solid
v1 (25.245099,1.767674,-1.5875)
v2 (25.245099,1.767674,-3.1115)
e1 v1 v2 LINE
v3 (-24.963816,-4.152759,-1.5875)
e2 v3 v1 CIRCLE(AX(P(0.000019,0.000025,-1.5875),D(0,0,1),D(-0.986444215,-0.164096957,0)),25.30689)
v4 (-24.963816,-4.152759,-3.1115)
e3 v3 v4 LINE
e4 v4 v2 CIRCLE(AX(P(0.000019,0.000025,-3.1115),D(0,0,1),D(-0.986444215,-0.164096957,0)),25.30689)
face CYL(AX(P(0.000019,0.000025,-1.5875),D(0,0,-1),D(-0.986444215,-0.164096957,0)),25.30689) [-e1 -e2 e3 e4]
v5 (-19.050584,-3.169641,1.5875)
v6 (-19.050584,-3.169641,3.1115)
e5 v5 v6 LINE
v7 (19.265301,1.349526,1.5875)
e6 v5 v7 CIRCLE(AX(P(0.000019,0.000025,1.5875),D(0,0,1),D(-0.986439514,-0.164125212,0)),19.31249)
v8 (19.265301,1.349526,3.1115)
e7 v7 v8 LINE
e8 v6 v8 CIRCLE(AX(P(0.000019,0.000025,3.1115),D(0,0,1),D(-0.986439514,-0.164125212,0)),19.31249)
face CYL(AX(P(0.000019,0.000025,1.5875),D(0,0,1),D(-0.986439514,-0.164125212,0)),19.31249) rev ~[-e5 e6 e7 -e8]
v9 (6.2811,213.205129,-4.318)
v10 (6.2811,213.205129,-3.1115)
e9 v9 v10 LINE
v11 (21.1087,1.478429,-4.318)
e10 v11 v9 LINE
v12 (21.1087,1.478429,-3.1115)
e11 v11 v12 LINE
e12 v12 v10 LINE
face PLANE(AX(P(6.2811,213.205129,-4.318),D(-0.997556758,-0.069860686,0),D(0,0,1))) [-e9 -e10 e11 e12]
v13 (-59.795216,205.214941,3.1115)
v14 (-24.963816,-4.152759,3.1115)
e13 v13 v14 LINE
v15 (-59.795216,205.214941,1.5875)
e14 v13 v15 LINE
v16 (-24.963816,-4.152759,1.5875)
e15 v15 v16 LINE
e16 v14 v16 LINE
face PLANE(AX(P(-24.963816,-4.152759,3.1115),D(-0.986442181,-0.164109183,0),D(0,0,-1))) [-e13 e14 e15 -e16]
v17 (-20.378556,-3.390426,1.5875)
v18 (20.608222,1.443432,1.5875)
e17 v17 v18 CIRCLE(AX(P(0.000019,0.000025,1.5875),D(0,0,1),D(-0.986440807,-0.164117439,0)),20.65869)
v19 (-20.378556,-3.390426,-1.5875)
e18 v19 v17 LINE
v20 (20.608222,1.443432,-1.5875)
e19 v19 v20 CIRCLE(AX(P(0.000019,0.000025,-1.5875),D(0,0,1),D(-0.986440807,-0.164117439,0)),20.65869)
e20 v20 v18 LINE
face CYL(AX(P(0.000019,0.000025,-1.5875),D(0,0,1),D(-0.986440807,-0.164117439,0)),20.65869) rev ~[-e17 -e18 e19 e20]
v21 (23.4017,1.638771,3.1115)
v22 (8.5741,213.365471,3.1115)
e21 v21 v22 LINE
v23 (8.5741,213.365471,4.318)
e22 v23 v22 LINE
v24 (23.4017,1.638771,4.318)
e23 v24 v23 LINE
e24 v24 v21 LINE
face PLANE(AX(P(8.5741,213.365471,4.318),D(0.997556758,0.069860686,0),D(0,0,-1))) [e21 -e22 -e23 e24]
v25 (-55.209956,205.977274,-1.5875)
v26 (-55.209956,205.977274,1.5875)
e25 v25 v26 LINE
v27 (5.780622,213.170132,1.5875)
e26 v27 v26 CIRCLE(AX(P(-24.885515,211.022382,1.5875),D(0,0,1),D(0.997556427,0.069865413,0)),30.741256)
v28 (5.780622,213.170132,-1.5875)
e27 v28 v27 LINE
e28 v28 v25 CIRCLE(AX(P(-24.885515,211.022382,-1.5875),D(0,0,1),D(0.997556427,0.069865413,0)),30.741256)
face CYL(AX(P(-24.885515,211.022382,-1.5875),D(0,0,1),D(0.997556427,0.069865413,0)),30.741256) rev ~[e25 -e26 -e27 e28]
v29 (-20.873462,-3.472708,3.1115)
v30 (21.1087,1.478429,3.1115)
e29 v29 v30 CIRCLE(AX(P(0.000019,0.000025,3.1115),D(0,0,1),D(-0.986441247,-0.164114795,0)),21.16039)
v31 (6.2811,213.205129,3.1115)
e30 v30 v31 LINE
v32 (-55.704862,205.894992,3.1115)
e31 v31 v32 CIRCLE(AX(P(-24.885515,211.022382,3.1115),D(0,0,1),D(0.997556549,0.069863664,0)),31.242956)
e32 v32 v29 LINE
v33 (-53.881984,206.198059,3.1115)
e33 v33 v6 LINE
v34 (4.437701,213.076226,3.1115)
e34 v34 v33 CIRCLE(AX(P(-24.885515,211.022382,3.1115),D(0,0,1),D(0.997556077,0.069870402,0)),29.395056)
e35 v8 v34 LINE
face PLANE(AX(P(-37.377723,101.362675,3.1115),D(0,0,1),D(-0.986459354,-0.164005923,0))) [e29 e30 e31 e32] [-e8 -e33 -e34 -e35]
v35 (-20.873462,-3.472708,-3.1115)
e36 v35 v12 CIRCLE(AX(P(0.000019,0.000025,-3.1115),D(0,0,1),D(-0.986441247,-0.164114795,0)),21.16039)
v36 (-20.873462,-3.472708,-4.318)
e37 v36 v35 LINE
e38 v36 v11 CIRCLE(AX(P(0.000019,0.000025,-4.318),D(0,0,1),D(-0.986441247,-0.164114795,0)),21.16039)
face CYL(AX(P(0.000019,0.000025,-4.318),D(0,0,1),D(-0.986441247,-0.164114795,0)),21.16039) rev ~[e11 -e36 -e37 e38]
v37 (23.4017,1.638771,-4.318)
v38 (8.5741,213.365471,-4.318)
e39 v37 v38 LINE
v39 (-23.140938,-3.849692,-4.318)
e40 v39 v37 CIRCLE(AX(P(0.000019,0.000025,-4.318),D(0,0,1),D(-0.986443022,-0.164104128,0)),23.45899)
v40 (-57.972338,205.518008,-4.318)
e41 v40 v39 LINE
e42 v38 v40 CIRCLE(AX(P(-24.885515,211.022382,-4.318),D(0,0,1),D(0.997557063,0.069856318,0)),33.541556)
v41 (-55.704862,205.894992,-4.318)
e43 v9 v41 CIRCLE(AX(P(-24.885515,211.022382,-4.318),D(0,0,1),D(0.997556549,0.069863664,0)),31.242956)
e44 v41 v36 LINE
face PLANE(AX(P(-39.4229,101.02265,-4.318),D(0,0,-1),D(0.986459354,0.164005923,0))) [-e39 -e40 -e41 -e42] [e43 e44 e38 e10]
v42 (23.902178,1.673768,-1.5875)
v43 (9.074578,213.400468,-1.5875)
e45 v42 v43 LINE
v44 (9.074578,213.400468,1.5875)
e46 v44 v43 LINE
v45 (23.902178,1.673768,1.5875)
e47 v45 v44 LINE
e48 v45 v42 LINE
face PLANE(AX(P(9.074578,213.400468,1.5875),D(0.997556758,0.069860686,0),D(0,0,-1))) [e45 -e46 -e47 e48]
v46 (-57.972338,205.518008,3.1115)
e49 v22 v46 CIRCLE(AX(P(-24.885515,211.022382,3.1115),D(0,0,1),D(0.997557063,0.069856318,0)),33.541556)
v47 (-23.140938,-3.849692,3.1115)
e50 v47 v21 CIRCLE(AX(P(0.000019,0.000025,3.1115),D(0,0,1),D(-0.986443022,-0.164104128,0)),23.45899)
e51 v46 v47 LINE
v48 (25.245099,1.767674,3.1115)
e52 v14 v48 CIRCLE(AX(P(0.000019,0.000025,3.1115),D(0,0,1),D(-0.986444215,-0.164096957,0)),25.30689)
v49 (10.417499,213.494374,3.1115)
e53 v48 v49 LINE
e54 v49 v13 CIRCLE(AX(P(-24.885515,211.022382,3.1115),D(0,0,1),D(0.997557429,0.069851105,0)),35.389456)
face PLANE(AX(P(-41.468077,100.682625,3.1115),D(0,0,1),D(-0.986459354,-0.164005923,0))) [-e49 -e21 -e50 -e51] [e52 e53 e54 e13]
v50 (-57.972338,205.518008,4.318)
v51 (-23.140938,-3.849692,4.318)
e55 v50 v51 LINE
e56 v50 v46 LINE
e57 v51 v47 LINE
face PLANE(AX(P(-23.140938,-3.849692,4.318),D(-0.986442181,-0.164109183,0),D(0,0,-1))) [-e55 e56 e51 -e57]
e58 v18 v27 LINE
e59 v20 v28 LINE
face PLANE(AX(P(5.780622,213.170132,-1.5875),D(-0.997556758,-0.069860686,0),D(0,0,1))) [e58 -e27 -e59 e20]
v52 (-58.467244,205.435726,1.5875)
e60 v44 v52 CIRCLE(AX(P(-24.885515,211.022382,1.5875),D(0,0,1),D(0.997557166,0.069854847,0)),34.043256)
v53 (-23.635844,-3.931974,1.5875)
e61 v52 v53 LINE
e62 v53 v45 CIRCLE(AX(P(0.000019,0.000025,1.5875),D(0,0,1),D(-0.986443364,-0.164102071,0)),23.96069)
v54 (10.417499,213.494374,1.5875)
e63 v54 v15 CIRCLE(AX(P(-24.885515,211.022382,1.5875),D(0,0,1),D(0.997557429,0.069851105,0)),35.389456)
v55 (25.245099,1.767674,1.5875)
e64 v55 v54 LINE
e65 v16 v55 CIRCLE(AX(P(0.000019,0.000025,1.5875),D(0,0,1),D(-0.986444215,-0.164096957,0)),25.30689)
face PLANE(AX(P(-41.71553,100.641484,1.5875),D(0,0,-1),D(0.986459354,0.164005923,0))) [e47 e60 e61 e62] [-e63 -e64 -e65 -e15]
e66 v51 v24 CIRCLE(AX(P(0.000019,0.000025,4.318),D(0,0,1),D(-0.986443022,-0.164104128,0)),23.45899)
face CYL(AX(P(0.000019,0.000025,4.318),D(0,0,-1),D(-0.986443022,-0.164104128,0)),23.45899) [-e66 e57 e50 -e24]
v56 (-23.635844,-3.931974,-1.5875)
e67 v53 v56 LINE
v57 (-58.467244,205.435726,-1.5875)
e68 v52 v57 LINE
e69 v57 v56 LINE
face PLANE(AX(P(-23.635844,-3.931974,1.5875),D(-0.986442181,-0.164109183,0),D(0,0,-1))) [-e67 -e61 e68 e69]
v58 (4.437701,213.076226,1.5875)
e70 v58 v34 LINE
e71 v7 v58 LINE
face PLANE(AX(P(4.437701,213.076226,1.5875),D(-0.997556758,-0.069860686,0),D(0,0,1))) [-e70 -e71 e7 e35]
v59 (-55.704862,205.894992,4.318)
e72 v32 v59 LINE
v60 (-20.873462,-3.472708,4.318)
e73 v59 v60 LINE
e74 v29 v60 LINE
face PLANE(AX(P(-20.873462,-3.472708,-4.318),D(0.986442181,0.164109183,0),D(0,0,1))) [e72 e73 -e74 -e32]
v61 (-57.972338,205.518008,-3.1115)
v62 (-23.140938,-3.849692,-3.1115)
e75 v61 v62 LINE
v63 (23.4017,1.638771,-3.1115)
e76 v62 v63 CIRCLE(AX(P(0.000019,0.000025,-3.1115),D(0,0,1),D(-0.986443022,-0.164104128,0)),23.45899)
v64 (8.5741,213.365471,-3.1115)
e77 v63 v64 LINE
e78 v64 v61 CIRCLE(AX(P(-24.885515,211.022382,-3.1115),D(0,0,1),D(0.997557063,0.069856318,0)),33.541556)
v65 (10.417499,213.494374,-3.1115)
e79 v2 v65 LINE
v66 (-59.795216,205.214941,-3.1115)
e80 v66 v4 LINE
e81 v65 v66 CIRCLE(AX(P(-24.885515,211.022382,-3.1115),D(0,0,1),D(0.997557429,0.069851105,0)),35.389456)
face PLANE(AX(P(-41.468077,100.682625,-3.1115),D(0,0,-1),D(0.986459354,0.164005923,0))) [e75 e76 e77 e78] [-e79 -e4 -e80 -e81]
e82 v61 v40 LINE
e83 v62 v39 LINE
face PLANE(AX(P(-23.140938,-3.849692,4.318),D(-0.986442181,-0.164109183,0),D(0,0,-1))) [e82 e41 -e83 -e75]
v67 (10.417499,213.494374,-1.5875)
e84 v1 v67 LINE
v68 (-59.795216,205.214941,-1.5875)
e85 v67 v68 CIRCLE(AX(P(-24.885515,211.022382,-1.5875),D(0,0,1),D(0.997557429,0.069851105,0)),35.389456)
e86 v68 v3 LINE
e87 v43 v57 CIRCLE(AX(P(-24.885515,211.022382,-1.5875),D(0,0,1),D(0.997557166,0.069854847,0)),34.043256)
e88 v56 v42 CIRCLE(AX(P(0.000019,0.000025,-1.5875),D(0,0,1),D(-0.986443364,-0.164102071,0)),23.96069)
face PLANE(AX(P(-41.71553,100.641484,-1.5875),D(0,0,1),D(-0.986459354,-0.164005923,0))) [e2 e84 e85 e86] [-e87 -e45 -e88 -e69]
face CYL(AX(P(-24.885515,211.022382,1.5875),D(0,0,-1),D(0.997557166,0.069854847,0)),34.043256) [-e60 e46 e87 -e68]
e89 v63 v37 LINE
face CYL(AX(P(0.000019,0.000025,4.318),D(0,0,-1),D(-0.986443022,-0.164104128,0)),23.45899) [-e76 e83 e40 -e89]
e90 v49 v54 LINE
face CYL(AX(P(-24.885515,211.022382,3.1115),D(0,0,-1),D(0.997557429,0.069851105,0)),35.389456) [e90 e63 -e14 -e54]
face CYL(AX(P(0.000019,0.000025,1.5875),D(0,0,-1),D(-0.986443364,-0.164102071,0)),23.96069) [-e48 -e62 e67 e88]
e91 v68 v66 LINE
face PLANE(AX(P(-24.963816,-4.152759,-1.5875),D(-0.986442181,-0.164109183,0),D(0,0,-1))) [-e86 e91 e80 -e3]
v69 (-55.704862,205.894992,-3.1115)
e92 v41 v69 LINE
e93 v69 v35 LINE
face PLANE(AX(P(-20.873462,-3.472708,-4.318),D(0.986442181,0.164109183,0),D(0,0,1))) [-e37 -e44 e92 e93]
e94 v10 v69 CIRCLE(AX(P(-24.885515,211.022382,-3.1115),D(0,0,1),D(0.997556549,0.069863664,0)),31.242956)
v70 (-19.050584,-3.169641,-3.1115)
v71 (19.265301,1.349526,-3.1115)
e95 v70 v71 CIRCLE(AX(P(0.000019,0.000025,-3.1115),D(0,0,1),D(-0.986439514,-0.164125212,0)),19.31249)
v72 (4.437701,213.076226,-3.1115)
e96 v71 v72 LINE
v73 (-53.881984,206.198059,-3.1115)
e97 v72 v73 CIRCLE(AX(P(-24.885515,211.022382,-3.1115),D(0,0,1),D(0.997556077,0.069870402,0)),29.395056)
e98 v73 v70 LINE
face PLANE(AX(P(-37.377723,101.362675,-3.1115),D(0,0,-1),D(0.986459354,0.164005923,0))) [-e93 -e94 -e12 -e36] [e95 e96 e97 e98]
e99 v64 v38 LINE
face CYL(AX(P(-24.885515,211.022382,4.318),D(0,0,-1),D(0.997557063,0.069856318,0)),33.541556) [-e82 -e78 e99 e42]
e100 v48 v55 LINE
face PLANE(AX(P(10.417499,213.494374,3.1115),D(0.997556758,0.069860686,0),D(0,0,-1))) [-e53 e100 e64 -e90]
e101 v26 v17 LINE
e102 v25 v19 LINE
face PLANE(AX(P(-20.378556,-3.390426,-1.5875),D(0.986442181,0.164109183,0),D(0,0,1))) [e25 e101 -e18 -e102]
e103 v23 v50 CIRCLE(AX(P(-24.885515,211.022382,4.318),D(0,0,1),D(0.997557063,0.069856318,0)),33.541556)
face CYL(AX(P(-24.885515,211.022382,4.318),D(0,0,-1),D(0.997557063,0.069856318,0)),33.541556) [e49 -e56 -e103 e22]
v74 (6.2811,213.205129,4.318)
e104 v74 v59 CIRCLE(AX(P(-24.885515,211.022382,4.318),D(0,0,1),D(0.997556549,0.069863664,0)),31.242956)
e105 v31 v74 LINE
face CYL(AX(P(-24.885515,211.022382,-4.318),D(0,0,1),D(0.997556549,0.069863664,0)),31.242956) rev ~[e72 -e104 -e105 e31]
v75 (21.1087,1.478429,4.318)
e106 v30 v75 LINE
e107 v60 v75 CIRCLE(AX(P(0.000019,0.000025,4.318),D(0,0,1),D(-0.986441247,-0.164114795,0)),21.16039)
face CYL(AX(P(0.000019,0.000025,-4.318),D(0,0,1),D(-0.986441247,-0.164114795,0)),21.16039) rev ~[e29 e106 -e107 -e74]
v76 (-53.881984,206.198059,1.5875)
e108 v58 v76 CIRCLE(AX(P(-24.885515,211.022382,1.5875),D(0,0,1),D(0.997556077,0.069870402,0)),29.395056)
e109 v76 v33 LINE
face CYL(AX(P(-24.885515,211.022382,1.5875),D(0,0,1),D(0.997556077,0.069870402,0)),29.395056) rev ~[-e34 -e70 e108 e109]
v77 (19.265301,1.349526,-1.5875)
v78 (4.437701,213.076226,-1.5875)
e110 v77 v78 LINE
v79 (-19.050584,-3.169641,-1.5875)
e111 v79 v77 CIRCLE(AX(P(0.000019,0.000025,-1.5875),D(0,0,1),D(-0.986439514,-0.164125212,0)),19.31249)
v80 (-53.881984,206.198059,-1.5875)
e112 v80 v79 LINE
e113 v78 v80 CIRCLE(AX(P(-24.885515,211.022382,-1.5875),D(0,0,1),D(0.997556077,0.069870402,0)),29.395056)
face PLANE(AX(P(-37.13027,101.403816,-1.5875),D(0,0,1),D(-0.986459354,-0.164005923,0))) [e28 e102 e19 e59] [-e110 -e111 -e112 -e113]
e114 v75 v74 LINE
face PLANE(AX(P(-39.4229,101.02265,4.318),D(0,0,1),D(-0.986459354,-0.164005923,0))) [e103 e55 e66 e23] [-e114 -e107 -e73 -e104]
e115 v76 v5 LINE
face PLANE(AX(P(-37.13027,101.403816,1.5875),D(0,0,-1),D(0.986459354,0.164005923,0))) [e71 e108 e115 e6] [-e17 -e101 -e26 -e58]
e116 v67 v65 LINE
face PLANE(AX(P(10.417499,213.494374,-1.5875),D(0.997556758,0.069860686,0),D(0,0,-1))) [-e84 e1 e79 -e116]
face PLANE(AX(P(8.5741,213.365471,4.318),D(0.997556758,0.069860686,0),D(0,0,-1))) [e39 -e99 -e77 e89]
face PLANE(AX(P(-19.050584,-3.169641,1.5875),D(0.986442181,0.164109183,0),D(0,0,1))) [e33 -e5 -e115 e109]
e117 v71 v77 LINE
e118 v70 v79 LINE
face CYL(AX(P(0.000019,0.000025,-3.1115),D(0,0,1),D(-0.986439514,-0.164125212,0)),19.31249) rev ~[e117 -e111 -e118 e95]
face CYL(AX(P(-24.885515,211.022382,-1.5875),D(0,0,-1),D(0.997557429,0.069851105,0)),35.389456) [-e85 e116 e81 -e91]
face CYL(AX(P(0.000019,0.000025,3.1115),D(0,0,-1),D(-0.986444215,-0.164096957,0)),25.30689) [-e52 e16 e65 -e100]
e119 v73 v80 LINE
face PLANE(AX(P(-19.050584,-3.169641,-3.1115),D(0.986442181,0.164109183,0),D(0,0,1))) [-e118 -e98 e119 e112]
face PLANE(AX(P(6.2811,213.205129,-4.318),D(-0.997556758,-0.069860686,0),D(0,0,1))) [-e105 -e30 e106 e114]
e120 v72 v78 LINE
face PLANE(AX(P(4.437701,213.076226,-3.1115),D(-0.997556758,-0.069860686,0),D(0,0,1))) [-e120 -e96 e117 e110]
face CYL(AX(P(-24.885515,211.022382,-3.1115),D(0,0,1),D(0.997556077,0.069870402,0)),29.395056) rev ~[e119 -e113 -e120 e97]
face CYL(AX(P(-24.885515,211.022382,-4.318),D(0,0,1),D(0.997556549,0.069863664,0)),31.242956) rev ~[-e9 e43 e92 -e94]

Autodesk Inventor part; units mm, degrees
ref_plane "Work Plane2" through (0, 0, 0) normal (-1, 0, 0) x (0, 0, 1)
ref_plane "Work Plane3" through (-24.8855, 211.0224, 0) normal (0.0366733, -0.9993273, 0) x (0, 0, 1)
sketch "Path" plane through (0, 0, 0) normal (0, 0, 1) x (1, 0, 0)
  arc A0 (-22.0072, -3.6612) -> (22.2552, 1.5586) centre (0, 0) ccw
  arc A1 (7.4276, 213.2853) -> (-56.8386, 205.7065) centre (-24.8855, 211.0224) ccw
  line L0 (7.4276, 213.2853) -> (22.2552, 1.5586)
  line L1 (-22.0072, -3.6612) -> (-56.8386, 205.7065)
ref_plane "Section Plane" through (22.2552, 1.5586, 0) normal (-0.0698604, 0.9975568, 0) x (0, 0, 1)
sketch "Section Sketch" plane through (22.2552, 1.5586, 0) normal (-0.0698604, 0.9975568, 0) x (0, 0, 1)
  line L0 (-4.318, -1.1493) -> (4.318, -1.1493)
  line L1 (4.318, -1.1493) -> (4.318, 1.1493)
  line L2 (4.318, 1.1493) -> (-4.318, 1.1493)
  line L3 (-4.318, 1.1493) -> (-4.318, -1.1493)
  line L4 (-1.5875, -1.651) -> (1.5875, -1.651)
  line L5 (1.5875, -1.651) -> (1.5875, 1.651)
  line L6 (1.5875, 1.651) -> (-1.5875, 1.651)
  line L7 (-1.5875, 1.651) -> (-1.5875, -1.651)
  line L8 (-1.5875, 0) -> (1.5875, 0) construction
  line L9 (-3.1115, -2.9972) -> (-1.5875, -2.9972)
  line L10 (-1.5875, -2.9972) -> (-1.5875, 2.9972)
  line L11 (-1.5875, 2.9972) -> (-3.1115, 2.9972)
  line L12 (-3.1115, 2.9972) -> (-3.1115, -2.9972)
  line L13 (1.5875, -2.9972) -> (3.1115, -2.9972)
  line L14 (3.1115, -2.9972) -> (3.1115, 2.9972)
  line L15 (3.1115, 2.9972) -> (1.5875, 2.9972)
  line L16 (1.5875, 2.9972) -> (1.5875, -2.9972)
  line L17 (-4.318, 0) -> (4.318, 0) construction
  point P0 (0, 0)
  point P1 (0, 0)
  dimension "d21" = 2.2987
  dimension "d22" = 3.302
  dimension "d23" = 3.175
  dimension "d24" = 1.524
  dimension "d31" = 5.9944
  dimension "d32" = 8.636
sweep "Solid" add profiles "Section Sketch" path "Path"
pattern_of_one "Strand Pattern"
equation "\"d21\" = da_d2"
equation "\"d22\" = da_d1"
equation "\"d23\" = da_b1"
equation "\"d24\" = da_t1 + da_t2"
equation "\"d30\" = da_pt"
equation "\"da_p\" = 6.35"
equation "\"da_b1\" = 3.175"
equation "\"da_h2\" = 5.9944"
equation "\"da_h3\" = 5.207"
equation "\"da_d1\" = 3.302"
equation "\"da_d2\" = 2.2987"
equation "\"da_pt\" = 6.4008"
equation "\"da_b\" = 8.636"
equation "\"da_t1\" = 0.762"
equation "\"da_t2\" = 0.762"
properties part number "446 Roller Chain"
